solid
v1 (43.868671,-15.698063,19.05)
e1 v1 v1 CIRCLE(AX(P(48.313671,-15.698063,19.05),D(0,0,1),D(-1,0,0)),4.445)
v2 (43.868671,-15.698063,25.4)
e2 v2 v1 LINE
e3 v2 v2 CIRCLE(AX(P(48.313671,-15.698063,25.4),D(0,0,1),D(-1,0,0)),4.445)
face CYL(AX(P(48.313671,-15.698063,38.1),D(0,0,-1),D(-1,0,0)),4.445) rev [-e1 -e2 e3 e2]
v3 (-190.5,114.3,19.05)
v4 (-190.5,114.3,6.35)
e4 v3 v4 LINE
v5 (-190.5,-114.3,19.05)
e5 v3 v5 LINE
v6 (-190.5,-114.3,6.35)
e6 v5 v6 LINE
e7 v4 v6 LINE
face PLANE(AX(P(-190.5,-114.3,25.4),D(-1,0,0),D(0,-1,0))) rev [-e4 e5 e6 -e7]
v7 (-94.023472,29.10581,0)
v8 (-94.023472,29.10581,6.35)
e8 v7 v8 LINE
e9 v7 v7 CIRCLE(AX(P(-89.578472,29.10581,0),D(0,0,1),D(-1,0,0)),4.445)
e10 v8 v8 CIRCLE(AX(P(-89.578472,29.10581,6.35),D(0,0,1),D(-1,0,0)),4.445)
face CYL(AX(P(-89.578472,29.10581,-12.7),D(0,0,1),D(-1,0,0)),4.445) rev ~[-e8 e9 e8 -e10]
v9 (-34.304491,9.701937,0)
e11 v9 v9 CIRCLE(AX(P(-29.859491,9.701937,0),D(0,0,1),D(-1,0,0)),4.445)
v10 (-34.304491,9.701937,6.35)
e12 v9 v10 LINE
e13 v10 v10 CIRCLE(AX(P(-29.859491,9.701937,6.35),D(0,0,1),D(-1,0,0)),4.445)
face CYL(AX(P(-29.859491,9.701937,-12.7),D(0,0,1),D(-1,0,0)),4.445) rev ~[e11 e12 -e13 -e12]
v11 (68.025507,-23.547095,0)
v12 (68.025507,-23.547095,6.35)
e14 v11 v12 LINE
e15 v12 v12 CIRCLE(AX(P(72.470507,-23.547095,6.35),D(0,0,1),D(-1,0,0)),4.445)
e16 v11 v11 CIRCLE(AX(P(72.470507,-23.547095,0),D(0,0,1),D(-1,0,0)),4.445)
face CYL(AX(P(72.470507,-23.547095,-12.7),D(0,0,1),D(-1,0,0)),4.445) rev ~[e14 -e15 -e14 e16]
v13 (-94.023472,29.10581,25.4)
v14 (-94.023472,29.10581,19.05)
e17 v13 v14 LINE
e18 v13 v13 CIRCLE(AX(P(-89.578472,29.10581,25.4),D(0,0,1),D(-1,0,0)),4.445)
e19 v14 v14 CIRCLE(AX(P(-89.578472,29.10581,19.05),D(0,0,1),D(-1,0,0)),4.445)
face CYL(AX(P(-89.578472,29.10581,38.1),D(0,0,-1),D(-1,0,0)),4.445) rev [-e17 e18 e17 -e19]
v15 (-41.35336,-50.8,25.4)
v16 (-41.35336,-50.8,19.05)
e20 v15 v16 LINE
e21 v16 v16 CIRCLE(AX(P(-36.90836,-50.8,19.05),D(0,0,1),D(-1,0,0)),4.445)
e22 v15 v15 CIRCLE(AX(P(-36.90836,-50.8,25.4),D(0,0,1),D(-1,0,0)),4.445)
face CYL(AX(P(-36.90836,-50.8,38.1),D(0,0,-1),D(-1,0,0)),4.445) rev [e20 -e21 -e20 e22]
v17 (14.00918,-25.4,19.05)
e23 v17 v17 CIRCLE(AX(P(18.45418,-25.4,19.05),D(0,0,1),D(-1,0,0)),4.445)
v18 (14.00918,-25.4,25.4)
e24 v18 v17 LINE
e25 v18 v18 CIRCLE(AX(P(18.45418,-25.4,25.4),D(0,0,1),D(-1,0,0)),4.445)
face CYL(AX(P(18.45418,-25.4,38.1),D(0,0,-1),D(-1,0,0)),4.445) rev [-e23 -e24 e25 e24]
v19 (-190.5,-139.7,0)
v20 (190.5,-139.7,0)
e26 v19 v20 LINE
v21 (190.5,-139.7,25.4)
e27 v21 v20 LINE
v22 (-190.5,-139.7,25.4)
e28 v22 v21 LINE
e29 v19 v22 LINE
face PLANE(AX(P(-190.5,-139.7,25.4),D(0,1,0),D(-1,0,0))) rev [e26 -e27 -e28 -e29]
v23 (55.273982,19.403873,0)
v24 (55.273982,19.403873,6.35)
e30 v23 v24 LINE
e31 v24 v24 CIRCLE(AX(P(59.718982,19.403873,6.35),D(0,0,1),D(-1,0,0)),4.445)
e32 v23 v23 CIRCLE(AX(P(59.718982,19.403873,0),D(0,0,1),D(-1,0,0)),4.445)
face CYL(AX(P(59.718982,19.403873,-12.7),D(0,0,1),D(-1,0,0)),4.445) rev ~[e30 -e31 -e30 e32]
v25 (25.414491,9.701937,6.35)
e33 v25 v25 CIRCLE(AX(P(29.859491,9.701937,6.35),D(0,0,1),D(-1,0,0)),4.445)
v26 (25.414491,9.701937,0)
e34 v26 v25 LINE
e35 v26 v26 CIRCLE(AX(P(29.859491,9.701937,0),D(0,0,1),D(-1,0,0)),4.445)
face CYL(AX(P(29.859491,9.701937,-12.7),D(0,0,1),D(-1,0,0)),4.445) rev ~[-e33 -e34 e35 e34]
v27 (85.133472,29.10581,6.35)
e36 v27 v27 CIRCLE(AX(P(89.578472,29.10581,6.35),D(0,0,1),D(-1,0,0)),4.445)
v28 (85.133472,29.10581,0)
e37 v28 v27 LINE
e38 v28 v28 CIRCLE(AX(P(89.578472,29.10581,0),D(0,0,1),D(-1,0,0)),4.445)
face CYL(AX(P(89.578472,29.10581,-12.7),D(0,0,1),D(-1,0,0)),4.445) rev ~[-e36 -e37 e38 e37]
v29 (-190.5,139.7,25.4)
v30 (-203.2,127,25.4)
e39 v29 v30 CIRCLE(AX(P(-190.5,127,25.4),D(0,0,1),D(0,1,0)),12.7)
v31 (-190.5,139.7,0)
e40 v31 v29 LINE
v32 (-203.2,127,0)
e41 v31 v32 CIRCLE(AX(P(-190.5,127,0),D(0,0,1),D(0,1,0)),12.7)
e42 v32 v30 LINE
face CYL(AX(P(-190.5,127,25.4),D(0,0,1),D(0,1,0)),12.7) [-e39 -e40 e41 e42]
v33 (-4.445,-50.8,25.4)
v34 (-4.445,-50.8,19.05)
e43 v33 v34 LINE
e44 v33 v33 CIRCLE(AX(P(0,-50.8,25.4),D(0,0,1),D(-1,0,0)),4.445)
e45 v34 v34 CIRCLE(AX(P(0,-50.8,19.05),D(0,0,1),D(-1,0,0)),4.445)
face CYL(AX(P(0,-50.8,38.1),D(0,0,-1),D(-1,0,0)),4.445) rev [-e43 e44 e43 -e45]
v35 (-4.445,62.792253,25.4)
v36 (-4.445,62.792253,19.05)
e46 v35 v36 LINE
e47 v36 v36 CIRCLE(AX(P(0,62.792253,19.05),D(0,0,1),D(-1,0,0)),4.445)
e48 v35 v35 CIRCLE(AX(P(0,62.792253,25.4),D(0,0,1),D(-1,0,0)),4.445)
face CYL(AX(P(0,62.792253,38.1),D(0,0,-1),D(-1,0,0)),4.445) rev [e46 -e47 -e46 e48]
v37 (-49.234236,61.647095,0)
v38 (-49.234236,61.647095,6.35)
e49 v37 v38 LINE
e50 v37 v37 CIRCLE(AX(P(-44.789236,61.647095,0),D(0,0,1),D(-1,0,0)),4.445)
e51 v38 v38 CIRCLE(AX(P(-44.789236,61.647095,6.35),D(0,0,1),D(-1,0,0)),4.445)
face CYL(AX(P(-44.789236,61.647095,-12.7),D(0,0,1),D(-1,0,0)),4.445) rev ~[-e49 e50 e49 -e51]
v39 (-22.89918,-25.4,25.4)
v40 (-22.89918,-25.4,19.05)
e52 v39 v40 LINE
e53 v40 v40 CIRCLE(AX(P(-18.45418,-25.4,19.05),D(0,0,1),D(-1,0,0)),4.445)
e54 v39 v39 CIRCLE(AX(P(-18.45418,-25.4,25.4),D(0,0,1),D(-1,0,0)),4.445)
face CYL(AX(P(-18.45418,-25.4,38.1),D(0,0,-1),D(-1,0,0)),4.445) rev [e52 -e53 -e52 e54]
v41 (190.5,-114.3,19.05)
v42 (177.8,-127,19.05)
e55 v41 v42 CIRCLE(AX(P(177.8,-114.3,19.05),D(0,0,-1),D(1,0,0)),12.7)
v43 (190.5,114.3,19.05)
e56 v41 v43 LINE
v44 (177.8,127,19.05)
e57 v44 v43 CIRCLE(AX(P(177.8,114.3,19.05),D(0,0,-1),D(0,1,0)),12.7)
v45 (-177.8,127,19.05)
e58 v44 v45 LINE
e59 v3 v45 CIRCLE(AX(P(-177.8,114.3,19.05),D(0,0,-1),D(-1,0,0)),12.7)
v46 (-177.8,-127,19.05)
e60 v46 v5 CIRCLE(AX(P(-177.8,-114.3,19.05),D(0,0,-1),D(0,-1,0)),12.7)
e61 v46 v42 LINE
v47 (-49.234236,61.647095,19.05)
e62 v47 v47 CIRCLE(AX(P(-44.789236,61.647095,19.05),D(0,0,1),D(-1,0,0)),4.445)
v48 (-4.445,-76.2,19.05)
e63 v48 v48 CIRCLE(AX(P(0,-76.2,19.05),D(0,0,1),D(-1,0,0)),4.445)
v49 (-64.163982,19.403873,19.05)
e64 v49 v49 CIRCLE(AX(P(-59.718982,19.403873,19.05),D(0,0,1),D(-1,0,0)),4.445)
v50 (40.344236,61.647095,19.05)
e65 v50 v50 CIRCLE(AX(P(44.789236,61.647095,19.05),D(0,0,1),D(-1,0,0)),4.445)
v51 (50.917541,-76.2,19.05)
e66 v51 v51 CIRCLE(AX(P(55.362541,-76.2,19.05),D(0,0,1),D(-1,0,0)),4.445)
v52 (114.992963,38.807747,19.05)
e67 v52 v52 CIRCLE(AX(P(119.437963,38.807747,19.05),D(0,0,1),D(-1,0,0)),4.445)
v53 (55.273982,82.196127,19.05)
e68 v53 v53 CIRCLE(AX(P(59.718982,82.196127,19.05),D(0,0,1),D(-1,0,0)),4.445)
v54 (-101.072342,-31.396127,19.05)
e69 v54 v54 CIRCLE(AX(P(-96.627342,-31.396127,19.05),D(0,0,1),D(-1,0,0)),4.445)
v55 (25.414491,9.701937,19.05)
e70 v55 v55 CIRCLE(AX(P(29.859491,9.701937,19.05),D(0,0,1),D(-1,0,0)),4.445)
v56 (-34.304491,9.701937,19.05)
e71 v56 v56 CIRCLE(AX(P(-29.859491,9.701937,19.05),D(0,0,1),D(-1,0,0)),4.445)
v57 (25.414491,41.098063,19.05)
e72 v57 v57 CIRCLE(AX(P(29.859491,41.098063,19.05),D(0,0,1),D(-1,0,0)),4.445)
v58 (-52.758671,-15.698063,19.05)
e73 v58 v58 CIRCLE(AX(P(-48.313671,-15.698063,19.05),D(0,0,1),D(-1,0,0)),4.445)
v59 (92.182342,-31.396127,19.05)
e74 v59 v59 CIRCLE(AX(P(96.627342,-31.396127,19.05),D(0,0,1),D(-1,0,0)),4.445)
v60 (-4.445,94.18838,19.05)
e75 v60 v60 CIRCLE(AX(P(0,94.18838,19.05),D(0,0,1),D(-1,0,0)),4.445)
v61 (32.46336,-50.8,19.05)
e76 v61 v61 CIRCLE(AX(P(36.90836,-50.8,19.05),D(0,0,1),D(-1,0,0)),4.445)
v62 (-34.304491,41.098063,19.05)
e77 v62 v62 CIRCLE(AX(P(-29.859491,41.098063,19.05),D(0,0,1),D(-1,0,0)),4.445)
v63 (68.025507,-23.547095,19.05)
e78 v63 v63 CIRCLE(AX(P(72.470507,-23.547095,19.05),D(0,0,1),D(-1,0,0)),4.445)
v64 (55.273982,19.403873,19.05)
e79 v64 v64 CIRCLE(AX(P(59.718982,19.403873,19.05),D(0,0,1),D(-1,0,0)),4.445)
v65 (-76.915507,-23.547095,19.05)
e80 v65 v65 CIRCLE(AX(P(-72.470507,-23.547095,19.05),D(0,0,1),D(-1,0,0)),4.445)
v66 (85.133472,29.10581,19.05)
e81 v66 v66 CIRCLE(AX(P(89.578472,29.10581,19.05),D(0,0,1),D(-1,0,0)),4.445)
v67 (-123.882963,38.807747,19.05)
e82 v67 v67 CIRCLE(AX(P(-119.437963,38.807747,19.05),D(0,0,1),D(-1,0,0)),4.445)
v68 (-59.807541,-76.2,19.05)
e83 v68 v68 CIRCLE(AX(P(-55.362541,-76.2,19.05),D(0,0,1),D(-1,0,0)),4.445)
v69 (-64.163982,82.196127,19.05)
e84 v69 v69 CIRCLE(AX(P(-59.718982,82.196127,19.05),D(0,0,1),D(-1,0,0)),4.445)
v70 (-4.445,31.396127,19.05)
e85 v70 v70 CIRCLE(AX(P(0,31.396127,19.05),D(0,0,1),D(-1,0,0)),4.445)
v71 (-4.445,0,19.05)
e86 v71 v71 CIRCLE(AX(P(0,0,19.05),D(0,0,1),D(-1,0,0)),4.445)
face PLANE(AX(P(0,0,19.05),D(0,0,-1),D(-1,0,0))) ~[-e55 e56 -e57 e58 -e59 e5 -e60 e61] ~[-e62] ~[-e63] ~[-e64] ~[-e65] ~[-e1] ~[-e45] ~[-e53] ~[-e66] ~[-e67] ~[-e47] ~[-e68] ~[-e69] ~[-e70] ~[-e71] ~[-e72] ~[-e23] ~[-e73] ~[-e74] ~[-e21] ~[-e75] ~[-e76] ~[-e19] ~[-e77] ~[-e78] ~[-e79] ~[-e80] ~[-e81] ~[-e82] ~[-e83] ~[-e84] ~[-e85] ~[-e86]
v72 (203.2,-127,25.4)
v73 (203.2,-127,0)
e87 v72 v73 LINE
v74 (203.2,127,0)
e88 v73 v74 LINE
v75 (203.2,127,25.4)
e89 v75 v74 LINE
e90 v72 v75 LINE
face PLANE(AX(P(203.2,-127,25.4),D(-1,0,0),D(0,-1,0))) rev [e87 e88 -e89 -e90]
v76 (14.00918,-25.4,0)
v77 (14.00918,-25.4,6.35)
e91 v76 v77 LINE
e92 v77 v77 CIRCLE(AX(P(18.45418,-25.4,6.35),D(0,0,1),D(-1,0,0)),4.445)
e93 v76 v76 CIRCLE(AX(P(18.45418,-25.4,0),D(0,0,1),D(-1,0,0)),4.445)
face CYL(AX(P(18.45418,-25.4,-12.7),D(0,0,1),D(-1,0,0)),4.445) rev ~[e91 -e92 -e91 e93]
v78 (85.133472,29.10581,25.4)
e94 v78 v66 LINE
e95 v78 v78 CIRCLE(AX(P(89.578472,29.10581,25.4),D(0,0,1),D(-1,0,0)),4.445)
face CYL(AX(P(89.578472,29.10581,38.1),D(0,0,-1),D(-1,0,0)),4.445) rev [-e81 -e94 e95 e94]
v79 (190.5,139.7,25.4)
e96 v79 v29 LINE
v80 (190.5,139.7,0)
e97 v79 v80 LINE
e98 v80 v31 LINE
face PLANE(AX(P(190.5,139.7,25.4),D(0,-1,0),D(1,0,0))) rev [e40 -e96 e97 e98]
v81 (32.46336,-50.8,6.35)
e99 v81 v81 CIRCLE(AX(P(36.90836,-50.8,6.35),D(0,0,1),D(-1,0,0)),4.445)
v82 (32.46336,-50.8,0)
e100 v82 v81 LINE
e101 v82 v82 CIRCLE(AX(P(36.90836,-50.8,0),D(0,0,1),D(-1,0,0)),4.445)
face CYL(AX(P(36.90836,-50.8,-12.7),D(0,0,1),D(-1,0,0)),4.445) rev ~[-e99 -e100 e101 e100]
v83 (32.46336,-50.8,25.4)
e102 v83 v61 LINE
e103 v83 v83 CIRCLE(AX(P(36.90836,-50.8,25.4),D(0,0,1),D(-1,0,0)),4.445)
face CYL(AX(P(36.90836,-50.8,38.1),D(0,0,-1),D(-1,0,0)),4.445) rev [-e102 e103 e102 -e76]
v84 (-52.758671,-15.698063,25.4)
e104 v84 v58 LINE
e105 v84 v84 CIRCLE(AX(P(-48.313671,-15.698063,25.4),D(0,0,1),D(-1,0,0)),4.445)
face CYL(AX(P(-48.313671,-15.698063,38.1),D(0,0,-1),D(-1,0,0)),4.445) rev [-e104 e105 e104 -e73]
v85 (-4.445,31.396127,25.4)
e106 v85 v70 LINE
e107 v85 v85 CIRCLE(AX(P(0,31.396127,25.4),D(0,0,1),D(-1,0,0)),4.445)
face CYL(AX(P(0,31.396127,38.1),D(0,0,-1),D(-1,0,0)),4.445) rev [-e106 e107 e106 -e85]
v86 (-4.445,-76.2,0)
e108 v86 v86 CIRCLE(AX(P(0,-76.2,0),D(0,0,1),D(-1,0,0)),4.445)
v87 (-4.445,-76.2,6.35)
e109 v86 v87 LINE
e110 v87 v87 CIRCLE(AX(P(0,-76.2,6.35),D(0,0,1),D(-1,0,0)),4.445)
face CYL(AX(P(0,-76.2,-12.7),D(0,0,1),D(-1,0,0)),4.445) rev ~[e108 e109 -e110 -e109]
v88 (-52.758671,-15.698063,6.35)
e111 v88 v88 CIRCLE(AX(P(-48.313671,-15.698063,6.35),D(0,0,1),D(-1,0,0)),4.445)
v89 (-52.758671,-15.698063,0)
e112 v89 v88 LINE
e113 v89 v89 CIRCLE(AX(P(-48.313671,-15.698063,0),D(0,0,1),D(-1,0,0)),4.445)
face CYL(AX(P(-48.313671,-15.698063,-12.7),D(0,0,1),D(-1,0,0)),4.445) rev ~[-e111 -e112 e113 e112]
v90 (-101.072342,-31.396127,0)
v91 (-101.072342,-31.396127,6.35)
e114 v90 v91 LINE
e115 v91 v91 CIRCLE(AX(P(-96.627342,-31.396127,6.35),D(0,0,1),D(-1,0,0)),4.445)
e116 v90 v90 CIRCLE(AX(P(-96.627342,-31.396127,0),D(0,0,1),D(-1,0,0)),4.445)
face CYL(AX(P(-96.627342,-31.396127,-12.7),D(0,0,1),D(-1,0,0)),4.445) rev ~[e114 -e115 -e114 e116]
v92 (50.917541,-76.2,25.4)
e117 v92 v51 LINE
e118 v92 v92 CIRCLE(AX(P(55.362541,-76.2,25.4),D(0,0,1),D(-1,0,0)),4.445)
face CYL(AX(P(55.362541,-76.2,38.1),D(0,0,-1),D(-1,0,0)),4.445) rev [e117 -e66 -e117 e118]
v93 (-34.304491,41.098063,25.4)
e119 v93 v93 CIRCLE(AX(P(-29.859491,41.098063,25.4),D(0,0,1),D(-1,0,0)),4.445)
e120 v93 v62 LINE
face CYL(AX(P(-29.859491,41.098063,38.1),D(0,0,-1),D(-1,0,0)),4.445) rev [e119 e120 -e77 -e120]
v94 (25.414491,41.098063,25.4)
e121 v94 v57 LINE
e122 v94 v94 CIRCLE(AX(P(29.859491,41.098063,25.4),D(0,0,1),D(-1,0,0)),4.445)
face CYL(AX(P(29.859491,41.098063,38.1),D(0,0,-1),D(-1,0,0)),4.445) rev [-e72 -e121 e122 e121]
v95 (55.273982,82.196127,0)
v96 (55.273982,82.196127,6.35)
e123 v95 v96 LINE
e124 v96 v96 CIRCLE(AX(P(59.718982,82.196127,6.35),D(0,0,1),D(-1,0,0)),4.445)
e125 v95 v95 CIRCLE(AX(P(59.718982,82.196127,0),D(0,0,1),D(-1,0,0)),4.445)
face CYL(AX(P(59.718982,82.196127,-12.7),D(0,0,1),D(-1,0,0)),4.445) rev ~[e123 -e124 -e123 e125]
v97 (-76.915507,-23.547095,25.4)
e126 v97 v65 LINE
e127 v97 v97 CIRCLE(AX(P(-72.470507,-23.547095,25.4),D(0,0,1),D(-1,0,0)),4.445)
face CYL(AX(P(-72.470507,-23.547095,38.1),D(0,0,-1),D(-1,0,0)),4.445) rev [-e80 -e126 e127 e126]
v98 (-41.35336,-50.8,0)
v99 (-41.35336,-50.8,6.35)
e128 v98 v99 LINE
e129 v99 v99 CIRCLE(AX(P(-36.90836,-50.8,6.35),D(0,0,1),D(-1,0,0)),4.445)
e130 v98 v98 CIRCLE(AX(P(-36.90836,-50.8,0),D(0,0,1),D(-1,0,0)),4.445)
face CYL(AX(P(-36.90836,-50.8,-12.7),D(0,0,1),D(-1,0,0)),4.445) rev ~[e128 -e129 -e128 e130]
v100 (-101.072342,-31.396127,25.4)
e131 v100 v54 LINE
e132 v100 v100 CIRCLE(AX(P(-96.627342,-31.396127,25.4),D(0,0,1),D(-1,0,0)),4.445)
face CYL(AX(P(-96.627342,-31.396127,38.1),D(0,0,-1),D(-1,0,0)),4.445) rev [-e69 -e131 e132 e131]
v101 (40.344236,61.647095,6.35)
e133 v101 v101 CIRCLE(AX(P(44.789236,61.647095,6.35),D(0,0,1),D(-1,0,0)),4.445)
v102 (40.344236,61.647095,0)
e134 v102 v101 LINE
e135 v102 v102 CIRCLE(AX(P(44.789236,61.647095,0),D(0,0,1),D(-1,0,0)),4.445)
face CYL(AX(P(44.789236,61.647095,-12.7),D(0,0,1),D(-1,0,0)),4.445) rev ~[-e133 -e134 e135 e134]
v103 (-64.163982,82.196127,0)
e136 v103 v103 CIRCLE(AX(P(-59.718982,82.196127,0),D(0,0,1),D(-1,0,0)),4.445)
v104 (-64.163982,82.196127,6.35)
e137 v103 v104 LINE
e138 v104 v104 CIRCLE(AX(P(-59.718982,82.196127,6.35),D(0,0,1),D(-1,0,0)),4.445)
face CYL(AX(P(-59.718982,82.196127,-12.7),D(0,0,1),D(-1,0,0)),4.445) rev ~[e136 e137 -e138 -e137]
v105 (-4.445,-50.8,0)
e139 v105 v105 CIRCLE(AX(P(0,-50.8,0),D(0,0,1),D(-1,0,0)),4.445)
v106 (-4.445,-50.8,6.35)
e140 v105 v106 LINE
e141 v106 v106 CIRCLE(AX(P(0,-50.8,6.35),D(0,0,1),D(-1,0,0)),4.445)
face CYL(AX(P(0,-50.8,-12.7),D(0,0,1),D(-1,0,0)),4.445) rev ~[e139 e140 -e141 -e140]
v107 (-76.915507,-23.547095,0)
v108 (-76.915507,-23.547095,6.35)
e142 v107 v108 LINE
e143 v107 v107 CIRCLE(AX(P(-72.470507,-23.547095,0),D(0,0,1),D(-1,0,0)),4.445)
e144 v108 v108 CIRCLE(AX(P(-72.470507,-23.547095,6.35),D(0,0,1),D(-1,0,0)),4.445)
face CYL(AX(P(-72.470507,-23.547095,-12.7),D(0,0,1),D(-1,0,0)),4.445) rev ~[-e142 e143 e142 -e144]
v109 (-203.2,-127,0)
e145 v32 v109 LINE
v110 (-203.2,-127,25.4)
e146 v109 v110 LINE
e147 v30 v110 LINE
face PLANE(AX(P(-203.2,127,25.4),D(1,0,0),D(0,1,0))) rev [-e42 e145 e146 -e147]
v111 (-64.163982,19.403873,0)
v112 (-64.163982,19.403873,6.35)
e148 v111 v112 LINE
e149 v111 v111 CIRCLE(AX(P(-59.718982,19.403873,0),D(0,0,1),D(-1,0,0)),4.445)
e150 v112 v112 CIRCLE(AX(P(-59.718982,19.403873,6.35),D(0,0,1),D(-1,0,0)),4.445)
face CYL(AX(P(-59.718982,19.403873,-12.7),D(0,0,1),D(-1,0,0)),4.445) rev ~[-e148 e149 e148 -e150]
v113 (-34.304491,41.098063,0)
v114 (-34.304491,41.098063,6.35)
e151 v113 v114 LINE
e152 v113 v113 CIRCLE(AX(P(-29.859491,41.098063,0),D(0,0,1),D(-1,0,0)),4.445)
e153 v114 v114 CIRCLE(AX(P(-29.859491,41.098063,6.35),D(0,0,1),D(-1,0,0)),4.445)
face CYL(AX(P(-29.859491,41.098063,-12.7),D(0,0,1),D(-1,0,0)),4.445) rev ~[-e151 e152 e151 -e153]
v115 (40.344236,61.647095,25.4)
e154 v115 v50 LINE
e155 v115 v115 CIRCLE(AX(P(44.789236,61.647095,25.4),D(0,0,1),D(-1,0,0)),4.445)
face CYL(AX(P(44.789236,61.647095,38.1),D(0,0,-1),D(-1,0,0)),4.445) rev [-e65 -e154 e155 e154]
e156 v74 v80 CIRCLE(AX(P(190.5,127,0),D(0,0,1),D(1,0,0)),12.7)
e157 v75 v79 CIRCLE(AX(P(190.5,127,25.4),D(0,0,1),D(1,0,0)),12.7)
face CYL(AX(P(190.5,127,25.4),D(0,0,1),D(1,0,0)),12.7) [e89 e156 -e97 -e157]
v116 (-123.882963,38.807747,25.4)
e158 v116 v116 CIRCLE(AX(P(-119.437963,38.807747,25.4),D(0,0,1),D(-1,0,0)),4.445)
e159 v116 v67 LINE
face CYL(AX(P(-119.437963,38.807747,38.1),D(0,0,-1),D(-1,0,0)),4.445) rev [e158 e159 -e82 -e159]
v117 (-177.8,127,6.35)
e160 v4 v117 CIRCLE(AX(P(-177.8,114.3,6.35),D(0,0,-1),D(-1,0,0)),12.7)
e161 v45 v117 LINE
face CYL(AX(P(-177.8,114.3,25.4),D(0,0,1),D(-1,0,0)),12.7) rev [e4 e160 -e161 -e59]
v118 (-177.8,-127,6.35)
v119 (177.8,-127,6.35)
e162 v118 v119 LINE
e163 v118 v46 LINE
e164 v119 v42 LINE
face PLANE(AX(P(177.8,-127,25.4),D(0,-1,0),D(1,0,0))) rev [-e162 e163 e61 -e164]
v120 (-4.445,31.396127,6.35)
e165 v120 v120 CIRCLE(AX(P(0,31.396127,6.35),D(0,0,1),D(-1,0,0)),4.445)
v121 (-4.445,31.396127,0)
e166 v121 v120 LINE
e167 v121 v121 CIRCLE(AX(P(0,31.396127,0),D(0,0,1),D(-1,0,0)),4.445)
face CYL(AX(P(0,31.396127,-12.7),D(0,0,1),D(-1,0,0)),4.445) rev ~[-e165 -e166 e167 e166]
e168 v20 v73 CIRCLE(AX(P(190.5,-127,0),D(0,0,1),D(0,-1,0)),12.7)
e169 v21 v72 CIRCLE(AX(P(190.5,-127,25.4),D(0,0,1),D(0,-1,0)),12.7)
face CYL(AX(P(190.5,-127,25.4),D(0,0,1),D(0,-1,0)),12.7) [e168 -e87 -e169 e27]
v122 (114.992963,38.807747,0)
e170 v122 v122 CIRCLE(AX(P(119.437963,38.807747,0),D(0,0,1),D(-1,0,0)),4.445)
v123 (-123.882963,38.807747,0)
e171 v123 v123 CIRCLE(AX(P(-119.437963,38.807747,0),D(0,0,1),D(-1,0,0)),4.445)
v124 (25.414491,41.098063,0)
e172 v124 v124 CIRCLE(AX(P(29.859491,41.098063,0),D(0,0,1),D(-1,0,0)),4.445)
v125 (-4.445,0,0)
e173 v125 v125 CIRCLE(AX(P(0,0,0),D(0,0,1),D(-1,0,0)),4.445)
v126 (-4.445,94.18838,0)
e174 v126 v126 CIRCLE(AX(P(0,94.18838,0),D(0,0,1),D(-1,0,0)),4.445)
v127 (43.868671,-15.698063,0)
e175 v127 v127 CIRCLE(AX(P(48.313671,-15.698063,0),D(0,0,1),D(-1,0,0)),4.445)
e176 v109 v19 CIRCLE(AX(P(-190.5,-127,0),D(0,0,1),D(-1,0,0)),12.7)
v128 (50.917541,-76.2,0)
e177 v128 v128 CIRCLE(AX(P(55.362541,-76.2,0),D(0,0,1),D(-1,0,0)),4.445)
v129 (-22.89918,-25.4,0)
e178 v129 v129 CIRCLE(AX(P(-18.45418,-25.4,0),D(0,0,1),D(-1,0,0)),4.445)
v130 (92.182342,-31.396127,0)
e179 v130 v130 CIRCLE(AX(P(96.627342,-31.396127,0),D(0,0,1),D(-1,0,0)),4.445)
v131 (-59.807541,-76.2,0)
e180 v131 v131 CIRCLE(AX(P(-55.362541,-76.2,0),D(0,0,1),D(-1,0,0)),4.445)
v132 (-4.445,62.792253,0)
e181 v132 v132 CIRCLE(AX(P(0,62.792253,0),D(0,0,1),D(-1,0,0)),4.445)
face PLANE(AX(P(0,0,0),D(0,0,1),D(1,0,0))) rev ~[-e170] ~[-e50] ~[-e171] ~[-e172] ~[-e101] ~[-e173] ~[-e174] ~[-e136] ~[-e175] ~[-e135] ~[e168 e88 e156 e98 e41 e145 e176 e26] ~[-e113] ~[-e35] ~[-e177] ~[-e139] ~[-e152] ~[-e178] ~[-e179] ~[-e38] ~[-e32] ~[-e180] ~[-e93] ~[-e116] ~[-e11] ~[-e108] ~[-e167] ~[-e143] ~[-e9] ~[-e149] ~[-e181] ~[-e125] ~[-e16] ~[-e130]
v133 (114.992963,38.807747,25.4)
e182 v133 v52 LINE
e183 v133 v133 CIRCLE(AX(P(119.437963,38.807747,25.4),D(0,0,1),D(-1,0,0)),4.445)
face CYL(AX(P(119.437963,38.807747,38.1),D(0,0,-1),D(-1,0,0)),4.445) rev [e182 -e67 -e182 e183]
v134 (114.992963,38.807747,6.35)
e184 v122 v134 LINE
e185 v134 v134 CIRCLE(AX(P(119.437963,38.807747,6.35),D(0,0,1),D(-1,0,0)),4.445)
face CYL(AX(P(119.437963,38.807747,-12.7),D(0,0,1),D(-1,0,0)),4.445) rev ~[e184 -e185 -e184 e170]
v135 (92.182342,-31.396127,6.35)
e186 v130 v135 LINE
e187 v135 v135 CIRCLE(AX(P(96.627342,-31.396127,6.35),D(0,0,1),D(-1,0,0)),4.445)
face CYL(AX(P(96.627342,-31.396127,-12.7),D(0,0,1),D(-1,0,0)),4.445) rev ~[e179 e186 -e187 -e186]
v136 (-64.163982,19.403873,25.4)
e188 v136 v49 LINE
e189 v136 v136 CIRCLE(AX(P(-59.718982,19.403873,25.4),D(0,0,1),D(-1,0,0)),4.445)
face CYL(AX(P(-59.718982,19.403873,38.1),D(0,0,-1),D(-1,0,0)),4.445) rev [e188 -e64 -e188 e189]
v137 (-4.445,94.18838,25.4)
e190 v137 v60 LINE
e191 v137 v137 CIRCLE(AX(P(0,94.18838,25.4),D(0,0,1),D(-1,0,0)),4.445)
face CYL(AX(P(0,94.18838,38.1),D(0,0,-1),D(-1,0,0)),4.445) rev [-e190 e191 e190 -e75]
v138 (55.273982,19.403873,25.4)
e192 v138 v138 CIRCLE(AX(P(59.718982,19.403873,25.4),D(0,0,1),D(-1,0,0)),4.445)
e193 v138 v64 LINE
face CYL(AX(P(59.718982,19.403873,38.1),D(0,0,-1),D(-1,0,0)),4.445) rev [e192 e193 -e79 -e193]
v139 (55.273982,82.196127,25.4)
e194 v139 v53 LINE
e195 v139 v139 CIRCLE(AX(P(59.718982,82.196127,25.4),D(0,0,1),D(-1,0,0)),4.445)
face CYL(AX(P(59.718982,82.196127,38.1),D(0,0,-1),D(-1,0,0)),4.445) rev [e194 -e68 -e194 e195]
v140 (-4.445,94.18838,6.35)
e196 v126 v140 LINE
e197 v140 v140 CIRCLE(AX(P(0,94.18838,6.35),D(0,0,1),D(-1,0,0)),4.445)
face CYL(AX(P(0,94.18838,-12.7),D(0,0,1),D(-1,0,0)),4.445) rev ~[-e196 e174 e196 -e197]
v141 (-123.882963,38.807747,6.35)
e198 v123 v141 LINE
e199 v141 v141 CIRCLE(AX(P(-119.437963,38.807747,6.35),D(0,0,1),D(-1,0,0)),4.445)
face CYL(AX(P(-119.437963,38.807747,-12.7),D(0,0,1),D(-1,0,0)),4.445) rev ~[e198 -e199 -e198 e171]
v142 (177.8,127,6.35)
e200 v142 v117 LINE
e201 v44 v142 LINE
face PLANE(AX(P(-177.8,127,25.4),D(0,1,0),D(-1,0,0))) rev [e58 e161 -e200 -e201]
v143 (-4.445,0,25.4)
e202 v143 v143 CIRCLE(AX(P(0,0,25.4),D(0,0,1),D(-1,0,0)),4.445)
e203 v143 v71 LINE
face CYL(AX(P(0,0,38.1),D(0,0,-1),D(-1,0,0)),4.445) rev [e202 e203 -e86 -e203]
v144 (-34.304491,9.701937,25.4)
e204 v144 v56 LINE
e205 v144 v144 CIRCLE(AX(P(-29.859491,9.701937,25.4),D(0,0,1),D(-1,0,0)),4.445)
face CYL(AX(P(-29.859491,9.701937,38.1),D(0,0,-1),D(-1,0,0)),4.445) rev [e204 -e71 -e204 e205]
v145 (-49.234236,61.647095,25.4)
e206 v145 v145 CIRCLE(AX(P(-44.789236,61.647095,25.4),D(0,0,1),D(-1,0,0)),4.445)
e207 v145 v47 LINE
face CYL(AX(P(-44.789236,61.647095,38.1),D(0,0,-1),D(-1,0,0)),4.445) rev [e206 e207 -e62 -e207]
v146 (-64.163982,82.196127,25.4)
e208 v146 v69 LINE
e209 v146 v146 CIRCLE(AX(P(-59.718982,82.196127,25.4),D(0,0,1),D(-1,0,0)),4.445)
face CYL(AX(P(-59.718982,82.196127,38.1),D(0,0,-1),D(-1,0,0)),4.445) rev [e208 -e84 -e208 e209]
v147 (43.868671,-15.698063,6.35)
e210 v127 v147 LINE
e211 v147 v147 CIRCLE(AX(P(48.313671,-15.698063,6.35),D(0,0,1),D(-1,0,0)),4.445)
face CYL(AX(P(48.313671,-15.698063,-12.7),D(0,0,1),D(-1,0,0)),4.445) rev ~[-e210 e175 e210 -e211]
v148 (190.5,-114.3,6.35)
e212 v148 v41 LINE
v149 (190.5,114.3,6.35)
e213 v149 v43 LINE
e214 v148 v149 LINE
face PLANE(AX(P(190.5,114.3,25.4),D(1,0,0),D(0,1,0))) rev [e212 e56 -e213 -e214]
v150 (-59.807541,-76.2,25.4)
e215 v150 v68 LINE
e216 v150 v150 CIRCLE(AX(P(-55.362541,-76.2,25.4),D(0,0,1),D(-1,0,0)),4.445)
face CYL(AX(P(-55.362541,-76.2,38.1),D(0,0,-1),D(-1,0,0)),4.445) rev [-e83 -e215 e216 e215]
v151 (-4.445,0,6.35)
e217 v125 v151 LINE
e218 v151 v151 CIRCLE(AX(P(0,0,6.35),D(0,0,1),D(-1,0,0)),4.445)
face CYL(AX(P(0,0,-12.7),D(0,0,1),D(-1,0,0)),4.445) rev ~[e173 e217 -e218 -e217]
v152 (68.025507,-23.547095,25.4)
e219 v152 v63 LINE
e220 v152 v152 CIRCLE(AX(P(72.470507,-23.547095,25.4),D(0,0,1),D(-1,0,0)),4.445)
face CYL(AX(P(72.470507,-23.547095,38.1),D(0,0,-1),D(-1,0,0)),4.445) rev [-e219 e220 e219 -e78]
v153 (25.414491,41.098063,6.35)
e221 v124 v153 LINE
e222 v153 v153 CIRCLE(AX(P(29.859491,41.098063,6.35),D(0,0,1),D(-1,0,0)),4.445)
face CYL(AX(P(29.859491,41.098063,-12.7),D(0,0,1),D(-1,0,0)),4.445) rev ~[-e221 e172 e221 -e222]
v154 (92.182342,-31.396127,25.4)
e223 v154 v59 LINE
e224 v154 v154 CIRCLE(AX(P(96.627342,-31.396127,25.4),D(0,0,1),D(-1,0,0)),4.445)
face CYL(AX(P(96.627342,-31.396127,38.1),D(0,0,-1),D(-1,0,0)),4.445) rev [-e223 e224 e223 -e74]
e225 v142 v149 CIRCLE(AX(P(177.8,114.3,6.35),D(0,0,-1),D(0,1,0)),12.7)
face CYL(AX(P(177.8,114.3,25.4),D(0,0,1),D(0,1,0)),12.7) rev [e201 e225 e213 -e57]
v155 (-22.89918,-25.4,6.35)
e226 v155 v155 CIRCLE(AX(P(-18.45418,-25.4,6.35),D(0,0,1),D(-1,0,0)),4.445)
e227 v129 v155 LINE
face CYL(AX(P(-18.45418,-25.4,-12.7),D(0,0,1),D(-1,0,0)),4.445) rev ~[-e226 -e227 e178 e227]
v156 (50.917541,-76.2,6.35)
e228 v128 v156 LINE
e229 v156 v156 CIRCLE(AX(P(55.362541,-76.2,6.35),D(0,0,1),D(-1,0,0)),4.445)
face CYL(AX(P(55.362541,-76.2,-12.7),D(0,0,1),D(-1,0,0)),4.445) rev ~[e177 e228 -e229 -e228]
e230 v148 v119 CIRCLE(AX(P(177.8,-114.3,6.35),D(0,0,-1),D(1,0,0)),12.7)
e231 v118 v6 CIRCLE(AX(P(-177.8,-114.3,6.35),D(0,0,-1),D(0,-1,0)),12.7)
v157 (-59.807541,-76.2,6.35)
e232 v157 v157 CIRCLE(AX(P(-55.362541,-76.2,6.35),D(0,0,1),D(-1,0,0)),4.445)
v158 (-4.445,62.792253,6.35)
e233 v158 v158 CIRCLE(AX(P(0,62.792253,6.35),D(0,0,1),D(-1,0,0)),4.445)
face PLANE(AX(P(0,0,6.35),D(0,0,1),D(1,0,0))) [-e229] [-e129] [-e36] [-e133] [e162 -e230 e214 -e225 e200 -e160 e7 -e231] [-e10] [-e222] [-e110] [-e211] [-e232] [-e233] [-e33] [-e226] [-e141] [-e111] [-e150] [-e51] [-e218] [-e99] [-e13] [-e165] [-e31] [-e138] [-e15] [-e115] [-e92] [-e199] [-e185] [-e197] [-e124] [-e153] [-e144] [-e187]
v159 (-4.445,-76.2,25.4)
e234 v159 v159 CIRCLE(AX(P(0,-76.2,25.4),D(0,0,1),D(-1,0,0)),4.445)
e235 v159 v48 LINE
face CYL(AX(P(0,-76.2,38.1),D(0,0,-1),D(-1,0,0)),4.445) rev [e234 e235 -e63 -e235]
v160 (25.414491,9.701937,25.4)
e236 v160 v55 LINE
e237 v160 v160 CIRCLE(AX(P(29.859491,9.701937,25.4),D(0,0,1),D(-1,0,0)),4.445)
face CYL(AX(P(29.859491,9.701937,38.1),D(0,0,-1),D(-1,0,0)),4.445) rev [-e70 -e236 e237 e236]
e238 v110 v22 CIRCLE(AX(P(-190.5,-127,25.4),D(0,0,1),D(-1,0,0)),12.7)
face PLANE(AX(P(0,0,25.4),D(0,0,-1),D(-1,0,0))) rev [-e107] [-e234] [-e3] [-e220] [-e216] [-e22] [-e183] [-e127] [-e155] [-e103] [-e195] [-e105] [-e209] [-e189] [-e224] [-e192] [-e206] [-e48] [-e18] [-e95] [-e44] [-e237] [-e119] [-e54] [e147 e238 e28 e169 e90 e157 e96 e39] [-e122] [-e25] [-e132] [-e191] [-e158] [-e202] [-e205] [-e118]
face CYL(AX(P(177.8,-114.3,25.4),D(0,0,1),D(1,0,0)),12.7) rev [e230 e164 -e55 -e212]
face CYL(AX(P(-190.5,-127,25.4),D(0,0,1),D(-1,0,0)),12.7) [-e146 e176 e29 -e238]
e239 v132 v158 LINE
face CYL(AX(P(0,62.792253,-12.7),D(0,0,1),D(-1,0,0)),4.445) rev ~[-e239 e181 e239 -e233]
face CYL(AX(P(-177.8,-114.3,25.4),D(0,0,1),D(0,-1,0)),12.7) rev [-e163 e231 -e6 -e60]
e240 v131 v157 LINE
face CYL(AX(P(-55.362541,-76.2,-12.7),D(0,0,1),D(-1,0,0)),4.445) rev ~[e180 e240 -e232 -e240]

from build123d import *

# Parameters (mm, degrees)
F1_DEPTH = 6.35
F2_DEPTH = 12.7
F4_D     = 8.89
F4_DEPTH = 12.7
F4_TIP   = 2.6708254516


# Not quite as in the source:
# - a feature names something its author has since deleted; it is built from what else it names


with BuildPart() as f1:
    # F0 (on Top) → F1 (new body)
    with BuildSketch(Plane.XY):
        with BuildLine():
            Line((190.5, 139.7), (0, 139.7))
            Line((0, 139.7), (-190.5, 139.7))
            ThreePointArc((-190.5, 139.7), (-199.4802561211, 135.9802561211), (-203.2, 127))
            Line((-203.2, 127), (-203.2, 0))
            Line((-203.2, 0), (-203.2, -127))
            ThreePointArc((-203.2, -127), (-199.4802561211, -135.9802561211), (-190.5, -139.7))
            Line((-190.5, -139.7), (0, -139.7))
            Line((0, -139.7), (190.5, -139.7))
            ThreePointArc((190.5, -139.7), (199.4802561211, -135.9802561211), (203.2, -127))
            Line((203.2, -127), (203.2, 0))
            Line((203.2, 0), (203.2, 127))
            ThreePointArc((203.2, 127), (199.4802561211, 135.9802561211), (190.5, 139.7))
        make_face()
        with BuildLine():
            ThreePointArc((177.8, 127), (186.7802561211, 123.2802561211), (190.5, 114.3))
            Line((190.5, 114.3), (190.5, -114.3))
            ThreePointArc((190.5, -114.3), (186.7802561211, -123.2802561211), (177.8, -127))
            Line((177.8, -127), (-177.8, -127))
            ThreePointArc((-177.8, -127), (-186.7802561211, -123.2802561211), (-190.5, -114.3))
            Line((-190.5, -114.3), (-190.5, 114.3))
            ThreePointArc((-190.5, 114.3), (-186.7802561211, 123.2802561211), (-177.8, 127))
            Line((-177.8, 127), (177.8, 127))
        make_face(mode=Mode.SUBTRACT)
        with BuildLine():
            Line((190.5, -114.3), (190.5, 114.3))
            ThreePointArc((190.5, 114.3), (186.7802561211, 123.2802561211), (177.8, 127))
            Line((177.8, 127), (-177.8, 127))
            ThreePointArc((-177.8, 127), (-186.7802561211, 123.2802561211), (-190.5, 114.3))
            Line((-190.5, 114.3), (-190.5, -114.3))
            ThreePointArc((-190.5, -114.3), (-186.7802561211, -123.2802561211), (-177.8, -127))
            Line((-177.8, -127), (177.8, -127))
            ThreePointArc((177.8, -127), (186.7802561211, -123.2802561211), (190.5, -114.3))
        make_face()
    extrude(amount=F1_DEPTH)

    # F0 (on Top) → F2 (join)
    with BuildSketch(Plane.XY):
        with BuildLine():
            Line((190.5, 139.7), (0, 139.7))
            Line((0, 139.7), (-190.5, 139.7))
            ThreePointArc((-190.5, 139.7), (-199.4802561211, 135.9802561211), (-203.2, 127))
            Line((-203.2, 127), (-203.2, 0))
            Line((-203.2, 0), (-203.2, -127))
            ThreePointArc((-203.2, -127), (-199.4802561211, -135.9802561211), (-190.5, -139.7))
            Line((-190.5, -139.7), (0, -139.7))
            Line((0, -139.7), (190.5, -139.7))
            ThreePointArc((190.5, -139.7), (199.4802561211, -135.9802561211), (203.2, -127))
            Line((203.2, -127), (203.2, 0))
            Line((203.2, 0), (203.2, 127))
            ThreePointArc((203.2, 127), (199.4802561211, 135.9802561211), (190.5, 139.7))
        make_face()
        with BuildLine():
            ThreePointArc((177.8, 127), (186.7802561211, 123.2802561211), (190.5, 114.3))
            Line((190.5, 114.3), (190.5, -114.3))
            ThreePointArc((190.5, -114.3), (186.7802561211, -123.2802561211), (177.8, -127))
            Line((177.8, -127), (-177.8, -127))
            ThreePointArc((-177.8, -127), (-186.7802561211, -123.2802561211), (-190.5, -114.3))
            Line((-190.5, -114.3), (-190.5, 114.3))
            ThreePointArc((-190.5, 114.3), (-186.7802561211, 123.2802561211), (-177.8, 127))
            Line((-177.8, 127), (177.8, 127))
        make_face(mode=Mode.SUBTRACT)
    extrude(amount=F2_DEPTH)

    # F4
    with Locations(Plane(origin=(0, 0, 0), x_dir=(1, 0, 0), z_dir=(0, 0, -1))):
        with Locations((18.4541802113, 25.4), (-18.4541802113, 25.4), (-29.8594908165, -9.7019366858), (0, -31.3961266285), (29.8594908165, -9.7019366858), (0, 0), (-36.9083604227, 50.8), (0, 50.8), (36.9083604227, 50.8), (59.7189816329, -19.4038733715), (0, -62.792253257), (-59.7189816329, -19.4038733715), (-72.4705065417, 23.5470949714), (-55.362540634, 76.2), (0, 76.2), (55.362540634, 76.2), (72.4705065417, 23.5470949714), (89.5784724494, -29.1058100573), (44.7892362247, -61.6470949714), (0, -94.1883798855), (-44.7892362247, -61.6470949714), (-89.5784724494, -29.1058100573), (-48.3136710278, 15.6980633142), (-29.8594908165, -41.0980633142), (29.8594908165, -41.0980633142), (48.3136710278, 15.6980633142), (-96.6273420556, 31.3961266285), (-119.4379632658, -38.807746743), (-59.7189816329, -82.1961266285), (59.7189816329, -82.1961266285), (119.4379632658, -38.807746743), (96.6273420556, 31.3961266285)):
            Hole(F4_D / 2, depth=F4_DEPTH)
            with Locations((0, 0, -(F4_DEPTH + F4_TIP / 2))):  # 118° drill point
                Cone(0, F4_D / 2, F4_TIP, mode=Mode.SUBTRACT)

    # F5: F1 across face


with BuildPart() as f1_1:
    add(f1.part)
    add(f1.part.mirror(Plane.XY.offset(12.7)))


solid = f1_1.part
